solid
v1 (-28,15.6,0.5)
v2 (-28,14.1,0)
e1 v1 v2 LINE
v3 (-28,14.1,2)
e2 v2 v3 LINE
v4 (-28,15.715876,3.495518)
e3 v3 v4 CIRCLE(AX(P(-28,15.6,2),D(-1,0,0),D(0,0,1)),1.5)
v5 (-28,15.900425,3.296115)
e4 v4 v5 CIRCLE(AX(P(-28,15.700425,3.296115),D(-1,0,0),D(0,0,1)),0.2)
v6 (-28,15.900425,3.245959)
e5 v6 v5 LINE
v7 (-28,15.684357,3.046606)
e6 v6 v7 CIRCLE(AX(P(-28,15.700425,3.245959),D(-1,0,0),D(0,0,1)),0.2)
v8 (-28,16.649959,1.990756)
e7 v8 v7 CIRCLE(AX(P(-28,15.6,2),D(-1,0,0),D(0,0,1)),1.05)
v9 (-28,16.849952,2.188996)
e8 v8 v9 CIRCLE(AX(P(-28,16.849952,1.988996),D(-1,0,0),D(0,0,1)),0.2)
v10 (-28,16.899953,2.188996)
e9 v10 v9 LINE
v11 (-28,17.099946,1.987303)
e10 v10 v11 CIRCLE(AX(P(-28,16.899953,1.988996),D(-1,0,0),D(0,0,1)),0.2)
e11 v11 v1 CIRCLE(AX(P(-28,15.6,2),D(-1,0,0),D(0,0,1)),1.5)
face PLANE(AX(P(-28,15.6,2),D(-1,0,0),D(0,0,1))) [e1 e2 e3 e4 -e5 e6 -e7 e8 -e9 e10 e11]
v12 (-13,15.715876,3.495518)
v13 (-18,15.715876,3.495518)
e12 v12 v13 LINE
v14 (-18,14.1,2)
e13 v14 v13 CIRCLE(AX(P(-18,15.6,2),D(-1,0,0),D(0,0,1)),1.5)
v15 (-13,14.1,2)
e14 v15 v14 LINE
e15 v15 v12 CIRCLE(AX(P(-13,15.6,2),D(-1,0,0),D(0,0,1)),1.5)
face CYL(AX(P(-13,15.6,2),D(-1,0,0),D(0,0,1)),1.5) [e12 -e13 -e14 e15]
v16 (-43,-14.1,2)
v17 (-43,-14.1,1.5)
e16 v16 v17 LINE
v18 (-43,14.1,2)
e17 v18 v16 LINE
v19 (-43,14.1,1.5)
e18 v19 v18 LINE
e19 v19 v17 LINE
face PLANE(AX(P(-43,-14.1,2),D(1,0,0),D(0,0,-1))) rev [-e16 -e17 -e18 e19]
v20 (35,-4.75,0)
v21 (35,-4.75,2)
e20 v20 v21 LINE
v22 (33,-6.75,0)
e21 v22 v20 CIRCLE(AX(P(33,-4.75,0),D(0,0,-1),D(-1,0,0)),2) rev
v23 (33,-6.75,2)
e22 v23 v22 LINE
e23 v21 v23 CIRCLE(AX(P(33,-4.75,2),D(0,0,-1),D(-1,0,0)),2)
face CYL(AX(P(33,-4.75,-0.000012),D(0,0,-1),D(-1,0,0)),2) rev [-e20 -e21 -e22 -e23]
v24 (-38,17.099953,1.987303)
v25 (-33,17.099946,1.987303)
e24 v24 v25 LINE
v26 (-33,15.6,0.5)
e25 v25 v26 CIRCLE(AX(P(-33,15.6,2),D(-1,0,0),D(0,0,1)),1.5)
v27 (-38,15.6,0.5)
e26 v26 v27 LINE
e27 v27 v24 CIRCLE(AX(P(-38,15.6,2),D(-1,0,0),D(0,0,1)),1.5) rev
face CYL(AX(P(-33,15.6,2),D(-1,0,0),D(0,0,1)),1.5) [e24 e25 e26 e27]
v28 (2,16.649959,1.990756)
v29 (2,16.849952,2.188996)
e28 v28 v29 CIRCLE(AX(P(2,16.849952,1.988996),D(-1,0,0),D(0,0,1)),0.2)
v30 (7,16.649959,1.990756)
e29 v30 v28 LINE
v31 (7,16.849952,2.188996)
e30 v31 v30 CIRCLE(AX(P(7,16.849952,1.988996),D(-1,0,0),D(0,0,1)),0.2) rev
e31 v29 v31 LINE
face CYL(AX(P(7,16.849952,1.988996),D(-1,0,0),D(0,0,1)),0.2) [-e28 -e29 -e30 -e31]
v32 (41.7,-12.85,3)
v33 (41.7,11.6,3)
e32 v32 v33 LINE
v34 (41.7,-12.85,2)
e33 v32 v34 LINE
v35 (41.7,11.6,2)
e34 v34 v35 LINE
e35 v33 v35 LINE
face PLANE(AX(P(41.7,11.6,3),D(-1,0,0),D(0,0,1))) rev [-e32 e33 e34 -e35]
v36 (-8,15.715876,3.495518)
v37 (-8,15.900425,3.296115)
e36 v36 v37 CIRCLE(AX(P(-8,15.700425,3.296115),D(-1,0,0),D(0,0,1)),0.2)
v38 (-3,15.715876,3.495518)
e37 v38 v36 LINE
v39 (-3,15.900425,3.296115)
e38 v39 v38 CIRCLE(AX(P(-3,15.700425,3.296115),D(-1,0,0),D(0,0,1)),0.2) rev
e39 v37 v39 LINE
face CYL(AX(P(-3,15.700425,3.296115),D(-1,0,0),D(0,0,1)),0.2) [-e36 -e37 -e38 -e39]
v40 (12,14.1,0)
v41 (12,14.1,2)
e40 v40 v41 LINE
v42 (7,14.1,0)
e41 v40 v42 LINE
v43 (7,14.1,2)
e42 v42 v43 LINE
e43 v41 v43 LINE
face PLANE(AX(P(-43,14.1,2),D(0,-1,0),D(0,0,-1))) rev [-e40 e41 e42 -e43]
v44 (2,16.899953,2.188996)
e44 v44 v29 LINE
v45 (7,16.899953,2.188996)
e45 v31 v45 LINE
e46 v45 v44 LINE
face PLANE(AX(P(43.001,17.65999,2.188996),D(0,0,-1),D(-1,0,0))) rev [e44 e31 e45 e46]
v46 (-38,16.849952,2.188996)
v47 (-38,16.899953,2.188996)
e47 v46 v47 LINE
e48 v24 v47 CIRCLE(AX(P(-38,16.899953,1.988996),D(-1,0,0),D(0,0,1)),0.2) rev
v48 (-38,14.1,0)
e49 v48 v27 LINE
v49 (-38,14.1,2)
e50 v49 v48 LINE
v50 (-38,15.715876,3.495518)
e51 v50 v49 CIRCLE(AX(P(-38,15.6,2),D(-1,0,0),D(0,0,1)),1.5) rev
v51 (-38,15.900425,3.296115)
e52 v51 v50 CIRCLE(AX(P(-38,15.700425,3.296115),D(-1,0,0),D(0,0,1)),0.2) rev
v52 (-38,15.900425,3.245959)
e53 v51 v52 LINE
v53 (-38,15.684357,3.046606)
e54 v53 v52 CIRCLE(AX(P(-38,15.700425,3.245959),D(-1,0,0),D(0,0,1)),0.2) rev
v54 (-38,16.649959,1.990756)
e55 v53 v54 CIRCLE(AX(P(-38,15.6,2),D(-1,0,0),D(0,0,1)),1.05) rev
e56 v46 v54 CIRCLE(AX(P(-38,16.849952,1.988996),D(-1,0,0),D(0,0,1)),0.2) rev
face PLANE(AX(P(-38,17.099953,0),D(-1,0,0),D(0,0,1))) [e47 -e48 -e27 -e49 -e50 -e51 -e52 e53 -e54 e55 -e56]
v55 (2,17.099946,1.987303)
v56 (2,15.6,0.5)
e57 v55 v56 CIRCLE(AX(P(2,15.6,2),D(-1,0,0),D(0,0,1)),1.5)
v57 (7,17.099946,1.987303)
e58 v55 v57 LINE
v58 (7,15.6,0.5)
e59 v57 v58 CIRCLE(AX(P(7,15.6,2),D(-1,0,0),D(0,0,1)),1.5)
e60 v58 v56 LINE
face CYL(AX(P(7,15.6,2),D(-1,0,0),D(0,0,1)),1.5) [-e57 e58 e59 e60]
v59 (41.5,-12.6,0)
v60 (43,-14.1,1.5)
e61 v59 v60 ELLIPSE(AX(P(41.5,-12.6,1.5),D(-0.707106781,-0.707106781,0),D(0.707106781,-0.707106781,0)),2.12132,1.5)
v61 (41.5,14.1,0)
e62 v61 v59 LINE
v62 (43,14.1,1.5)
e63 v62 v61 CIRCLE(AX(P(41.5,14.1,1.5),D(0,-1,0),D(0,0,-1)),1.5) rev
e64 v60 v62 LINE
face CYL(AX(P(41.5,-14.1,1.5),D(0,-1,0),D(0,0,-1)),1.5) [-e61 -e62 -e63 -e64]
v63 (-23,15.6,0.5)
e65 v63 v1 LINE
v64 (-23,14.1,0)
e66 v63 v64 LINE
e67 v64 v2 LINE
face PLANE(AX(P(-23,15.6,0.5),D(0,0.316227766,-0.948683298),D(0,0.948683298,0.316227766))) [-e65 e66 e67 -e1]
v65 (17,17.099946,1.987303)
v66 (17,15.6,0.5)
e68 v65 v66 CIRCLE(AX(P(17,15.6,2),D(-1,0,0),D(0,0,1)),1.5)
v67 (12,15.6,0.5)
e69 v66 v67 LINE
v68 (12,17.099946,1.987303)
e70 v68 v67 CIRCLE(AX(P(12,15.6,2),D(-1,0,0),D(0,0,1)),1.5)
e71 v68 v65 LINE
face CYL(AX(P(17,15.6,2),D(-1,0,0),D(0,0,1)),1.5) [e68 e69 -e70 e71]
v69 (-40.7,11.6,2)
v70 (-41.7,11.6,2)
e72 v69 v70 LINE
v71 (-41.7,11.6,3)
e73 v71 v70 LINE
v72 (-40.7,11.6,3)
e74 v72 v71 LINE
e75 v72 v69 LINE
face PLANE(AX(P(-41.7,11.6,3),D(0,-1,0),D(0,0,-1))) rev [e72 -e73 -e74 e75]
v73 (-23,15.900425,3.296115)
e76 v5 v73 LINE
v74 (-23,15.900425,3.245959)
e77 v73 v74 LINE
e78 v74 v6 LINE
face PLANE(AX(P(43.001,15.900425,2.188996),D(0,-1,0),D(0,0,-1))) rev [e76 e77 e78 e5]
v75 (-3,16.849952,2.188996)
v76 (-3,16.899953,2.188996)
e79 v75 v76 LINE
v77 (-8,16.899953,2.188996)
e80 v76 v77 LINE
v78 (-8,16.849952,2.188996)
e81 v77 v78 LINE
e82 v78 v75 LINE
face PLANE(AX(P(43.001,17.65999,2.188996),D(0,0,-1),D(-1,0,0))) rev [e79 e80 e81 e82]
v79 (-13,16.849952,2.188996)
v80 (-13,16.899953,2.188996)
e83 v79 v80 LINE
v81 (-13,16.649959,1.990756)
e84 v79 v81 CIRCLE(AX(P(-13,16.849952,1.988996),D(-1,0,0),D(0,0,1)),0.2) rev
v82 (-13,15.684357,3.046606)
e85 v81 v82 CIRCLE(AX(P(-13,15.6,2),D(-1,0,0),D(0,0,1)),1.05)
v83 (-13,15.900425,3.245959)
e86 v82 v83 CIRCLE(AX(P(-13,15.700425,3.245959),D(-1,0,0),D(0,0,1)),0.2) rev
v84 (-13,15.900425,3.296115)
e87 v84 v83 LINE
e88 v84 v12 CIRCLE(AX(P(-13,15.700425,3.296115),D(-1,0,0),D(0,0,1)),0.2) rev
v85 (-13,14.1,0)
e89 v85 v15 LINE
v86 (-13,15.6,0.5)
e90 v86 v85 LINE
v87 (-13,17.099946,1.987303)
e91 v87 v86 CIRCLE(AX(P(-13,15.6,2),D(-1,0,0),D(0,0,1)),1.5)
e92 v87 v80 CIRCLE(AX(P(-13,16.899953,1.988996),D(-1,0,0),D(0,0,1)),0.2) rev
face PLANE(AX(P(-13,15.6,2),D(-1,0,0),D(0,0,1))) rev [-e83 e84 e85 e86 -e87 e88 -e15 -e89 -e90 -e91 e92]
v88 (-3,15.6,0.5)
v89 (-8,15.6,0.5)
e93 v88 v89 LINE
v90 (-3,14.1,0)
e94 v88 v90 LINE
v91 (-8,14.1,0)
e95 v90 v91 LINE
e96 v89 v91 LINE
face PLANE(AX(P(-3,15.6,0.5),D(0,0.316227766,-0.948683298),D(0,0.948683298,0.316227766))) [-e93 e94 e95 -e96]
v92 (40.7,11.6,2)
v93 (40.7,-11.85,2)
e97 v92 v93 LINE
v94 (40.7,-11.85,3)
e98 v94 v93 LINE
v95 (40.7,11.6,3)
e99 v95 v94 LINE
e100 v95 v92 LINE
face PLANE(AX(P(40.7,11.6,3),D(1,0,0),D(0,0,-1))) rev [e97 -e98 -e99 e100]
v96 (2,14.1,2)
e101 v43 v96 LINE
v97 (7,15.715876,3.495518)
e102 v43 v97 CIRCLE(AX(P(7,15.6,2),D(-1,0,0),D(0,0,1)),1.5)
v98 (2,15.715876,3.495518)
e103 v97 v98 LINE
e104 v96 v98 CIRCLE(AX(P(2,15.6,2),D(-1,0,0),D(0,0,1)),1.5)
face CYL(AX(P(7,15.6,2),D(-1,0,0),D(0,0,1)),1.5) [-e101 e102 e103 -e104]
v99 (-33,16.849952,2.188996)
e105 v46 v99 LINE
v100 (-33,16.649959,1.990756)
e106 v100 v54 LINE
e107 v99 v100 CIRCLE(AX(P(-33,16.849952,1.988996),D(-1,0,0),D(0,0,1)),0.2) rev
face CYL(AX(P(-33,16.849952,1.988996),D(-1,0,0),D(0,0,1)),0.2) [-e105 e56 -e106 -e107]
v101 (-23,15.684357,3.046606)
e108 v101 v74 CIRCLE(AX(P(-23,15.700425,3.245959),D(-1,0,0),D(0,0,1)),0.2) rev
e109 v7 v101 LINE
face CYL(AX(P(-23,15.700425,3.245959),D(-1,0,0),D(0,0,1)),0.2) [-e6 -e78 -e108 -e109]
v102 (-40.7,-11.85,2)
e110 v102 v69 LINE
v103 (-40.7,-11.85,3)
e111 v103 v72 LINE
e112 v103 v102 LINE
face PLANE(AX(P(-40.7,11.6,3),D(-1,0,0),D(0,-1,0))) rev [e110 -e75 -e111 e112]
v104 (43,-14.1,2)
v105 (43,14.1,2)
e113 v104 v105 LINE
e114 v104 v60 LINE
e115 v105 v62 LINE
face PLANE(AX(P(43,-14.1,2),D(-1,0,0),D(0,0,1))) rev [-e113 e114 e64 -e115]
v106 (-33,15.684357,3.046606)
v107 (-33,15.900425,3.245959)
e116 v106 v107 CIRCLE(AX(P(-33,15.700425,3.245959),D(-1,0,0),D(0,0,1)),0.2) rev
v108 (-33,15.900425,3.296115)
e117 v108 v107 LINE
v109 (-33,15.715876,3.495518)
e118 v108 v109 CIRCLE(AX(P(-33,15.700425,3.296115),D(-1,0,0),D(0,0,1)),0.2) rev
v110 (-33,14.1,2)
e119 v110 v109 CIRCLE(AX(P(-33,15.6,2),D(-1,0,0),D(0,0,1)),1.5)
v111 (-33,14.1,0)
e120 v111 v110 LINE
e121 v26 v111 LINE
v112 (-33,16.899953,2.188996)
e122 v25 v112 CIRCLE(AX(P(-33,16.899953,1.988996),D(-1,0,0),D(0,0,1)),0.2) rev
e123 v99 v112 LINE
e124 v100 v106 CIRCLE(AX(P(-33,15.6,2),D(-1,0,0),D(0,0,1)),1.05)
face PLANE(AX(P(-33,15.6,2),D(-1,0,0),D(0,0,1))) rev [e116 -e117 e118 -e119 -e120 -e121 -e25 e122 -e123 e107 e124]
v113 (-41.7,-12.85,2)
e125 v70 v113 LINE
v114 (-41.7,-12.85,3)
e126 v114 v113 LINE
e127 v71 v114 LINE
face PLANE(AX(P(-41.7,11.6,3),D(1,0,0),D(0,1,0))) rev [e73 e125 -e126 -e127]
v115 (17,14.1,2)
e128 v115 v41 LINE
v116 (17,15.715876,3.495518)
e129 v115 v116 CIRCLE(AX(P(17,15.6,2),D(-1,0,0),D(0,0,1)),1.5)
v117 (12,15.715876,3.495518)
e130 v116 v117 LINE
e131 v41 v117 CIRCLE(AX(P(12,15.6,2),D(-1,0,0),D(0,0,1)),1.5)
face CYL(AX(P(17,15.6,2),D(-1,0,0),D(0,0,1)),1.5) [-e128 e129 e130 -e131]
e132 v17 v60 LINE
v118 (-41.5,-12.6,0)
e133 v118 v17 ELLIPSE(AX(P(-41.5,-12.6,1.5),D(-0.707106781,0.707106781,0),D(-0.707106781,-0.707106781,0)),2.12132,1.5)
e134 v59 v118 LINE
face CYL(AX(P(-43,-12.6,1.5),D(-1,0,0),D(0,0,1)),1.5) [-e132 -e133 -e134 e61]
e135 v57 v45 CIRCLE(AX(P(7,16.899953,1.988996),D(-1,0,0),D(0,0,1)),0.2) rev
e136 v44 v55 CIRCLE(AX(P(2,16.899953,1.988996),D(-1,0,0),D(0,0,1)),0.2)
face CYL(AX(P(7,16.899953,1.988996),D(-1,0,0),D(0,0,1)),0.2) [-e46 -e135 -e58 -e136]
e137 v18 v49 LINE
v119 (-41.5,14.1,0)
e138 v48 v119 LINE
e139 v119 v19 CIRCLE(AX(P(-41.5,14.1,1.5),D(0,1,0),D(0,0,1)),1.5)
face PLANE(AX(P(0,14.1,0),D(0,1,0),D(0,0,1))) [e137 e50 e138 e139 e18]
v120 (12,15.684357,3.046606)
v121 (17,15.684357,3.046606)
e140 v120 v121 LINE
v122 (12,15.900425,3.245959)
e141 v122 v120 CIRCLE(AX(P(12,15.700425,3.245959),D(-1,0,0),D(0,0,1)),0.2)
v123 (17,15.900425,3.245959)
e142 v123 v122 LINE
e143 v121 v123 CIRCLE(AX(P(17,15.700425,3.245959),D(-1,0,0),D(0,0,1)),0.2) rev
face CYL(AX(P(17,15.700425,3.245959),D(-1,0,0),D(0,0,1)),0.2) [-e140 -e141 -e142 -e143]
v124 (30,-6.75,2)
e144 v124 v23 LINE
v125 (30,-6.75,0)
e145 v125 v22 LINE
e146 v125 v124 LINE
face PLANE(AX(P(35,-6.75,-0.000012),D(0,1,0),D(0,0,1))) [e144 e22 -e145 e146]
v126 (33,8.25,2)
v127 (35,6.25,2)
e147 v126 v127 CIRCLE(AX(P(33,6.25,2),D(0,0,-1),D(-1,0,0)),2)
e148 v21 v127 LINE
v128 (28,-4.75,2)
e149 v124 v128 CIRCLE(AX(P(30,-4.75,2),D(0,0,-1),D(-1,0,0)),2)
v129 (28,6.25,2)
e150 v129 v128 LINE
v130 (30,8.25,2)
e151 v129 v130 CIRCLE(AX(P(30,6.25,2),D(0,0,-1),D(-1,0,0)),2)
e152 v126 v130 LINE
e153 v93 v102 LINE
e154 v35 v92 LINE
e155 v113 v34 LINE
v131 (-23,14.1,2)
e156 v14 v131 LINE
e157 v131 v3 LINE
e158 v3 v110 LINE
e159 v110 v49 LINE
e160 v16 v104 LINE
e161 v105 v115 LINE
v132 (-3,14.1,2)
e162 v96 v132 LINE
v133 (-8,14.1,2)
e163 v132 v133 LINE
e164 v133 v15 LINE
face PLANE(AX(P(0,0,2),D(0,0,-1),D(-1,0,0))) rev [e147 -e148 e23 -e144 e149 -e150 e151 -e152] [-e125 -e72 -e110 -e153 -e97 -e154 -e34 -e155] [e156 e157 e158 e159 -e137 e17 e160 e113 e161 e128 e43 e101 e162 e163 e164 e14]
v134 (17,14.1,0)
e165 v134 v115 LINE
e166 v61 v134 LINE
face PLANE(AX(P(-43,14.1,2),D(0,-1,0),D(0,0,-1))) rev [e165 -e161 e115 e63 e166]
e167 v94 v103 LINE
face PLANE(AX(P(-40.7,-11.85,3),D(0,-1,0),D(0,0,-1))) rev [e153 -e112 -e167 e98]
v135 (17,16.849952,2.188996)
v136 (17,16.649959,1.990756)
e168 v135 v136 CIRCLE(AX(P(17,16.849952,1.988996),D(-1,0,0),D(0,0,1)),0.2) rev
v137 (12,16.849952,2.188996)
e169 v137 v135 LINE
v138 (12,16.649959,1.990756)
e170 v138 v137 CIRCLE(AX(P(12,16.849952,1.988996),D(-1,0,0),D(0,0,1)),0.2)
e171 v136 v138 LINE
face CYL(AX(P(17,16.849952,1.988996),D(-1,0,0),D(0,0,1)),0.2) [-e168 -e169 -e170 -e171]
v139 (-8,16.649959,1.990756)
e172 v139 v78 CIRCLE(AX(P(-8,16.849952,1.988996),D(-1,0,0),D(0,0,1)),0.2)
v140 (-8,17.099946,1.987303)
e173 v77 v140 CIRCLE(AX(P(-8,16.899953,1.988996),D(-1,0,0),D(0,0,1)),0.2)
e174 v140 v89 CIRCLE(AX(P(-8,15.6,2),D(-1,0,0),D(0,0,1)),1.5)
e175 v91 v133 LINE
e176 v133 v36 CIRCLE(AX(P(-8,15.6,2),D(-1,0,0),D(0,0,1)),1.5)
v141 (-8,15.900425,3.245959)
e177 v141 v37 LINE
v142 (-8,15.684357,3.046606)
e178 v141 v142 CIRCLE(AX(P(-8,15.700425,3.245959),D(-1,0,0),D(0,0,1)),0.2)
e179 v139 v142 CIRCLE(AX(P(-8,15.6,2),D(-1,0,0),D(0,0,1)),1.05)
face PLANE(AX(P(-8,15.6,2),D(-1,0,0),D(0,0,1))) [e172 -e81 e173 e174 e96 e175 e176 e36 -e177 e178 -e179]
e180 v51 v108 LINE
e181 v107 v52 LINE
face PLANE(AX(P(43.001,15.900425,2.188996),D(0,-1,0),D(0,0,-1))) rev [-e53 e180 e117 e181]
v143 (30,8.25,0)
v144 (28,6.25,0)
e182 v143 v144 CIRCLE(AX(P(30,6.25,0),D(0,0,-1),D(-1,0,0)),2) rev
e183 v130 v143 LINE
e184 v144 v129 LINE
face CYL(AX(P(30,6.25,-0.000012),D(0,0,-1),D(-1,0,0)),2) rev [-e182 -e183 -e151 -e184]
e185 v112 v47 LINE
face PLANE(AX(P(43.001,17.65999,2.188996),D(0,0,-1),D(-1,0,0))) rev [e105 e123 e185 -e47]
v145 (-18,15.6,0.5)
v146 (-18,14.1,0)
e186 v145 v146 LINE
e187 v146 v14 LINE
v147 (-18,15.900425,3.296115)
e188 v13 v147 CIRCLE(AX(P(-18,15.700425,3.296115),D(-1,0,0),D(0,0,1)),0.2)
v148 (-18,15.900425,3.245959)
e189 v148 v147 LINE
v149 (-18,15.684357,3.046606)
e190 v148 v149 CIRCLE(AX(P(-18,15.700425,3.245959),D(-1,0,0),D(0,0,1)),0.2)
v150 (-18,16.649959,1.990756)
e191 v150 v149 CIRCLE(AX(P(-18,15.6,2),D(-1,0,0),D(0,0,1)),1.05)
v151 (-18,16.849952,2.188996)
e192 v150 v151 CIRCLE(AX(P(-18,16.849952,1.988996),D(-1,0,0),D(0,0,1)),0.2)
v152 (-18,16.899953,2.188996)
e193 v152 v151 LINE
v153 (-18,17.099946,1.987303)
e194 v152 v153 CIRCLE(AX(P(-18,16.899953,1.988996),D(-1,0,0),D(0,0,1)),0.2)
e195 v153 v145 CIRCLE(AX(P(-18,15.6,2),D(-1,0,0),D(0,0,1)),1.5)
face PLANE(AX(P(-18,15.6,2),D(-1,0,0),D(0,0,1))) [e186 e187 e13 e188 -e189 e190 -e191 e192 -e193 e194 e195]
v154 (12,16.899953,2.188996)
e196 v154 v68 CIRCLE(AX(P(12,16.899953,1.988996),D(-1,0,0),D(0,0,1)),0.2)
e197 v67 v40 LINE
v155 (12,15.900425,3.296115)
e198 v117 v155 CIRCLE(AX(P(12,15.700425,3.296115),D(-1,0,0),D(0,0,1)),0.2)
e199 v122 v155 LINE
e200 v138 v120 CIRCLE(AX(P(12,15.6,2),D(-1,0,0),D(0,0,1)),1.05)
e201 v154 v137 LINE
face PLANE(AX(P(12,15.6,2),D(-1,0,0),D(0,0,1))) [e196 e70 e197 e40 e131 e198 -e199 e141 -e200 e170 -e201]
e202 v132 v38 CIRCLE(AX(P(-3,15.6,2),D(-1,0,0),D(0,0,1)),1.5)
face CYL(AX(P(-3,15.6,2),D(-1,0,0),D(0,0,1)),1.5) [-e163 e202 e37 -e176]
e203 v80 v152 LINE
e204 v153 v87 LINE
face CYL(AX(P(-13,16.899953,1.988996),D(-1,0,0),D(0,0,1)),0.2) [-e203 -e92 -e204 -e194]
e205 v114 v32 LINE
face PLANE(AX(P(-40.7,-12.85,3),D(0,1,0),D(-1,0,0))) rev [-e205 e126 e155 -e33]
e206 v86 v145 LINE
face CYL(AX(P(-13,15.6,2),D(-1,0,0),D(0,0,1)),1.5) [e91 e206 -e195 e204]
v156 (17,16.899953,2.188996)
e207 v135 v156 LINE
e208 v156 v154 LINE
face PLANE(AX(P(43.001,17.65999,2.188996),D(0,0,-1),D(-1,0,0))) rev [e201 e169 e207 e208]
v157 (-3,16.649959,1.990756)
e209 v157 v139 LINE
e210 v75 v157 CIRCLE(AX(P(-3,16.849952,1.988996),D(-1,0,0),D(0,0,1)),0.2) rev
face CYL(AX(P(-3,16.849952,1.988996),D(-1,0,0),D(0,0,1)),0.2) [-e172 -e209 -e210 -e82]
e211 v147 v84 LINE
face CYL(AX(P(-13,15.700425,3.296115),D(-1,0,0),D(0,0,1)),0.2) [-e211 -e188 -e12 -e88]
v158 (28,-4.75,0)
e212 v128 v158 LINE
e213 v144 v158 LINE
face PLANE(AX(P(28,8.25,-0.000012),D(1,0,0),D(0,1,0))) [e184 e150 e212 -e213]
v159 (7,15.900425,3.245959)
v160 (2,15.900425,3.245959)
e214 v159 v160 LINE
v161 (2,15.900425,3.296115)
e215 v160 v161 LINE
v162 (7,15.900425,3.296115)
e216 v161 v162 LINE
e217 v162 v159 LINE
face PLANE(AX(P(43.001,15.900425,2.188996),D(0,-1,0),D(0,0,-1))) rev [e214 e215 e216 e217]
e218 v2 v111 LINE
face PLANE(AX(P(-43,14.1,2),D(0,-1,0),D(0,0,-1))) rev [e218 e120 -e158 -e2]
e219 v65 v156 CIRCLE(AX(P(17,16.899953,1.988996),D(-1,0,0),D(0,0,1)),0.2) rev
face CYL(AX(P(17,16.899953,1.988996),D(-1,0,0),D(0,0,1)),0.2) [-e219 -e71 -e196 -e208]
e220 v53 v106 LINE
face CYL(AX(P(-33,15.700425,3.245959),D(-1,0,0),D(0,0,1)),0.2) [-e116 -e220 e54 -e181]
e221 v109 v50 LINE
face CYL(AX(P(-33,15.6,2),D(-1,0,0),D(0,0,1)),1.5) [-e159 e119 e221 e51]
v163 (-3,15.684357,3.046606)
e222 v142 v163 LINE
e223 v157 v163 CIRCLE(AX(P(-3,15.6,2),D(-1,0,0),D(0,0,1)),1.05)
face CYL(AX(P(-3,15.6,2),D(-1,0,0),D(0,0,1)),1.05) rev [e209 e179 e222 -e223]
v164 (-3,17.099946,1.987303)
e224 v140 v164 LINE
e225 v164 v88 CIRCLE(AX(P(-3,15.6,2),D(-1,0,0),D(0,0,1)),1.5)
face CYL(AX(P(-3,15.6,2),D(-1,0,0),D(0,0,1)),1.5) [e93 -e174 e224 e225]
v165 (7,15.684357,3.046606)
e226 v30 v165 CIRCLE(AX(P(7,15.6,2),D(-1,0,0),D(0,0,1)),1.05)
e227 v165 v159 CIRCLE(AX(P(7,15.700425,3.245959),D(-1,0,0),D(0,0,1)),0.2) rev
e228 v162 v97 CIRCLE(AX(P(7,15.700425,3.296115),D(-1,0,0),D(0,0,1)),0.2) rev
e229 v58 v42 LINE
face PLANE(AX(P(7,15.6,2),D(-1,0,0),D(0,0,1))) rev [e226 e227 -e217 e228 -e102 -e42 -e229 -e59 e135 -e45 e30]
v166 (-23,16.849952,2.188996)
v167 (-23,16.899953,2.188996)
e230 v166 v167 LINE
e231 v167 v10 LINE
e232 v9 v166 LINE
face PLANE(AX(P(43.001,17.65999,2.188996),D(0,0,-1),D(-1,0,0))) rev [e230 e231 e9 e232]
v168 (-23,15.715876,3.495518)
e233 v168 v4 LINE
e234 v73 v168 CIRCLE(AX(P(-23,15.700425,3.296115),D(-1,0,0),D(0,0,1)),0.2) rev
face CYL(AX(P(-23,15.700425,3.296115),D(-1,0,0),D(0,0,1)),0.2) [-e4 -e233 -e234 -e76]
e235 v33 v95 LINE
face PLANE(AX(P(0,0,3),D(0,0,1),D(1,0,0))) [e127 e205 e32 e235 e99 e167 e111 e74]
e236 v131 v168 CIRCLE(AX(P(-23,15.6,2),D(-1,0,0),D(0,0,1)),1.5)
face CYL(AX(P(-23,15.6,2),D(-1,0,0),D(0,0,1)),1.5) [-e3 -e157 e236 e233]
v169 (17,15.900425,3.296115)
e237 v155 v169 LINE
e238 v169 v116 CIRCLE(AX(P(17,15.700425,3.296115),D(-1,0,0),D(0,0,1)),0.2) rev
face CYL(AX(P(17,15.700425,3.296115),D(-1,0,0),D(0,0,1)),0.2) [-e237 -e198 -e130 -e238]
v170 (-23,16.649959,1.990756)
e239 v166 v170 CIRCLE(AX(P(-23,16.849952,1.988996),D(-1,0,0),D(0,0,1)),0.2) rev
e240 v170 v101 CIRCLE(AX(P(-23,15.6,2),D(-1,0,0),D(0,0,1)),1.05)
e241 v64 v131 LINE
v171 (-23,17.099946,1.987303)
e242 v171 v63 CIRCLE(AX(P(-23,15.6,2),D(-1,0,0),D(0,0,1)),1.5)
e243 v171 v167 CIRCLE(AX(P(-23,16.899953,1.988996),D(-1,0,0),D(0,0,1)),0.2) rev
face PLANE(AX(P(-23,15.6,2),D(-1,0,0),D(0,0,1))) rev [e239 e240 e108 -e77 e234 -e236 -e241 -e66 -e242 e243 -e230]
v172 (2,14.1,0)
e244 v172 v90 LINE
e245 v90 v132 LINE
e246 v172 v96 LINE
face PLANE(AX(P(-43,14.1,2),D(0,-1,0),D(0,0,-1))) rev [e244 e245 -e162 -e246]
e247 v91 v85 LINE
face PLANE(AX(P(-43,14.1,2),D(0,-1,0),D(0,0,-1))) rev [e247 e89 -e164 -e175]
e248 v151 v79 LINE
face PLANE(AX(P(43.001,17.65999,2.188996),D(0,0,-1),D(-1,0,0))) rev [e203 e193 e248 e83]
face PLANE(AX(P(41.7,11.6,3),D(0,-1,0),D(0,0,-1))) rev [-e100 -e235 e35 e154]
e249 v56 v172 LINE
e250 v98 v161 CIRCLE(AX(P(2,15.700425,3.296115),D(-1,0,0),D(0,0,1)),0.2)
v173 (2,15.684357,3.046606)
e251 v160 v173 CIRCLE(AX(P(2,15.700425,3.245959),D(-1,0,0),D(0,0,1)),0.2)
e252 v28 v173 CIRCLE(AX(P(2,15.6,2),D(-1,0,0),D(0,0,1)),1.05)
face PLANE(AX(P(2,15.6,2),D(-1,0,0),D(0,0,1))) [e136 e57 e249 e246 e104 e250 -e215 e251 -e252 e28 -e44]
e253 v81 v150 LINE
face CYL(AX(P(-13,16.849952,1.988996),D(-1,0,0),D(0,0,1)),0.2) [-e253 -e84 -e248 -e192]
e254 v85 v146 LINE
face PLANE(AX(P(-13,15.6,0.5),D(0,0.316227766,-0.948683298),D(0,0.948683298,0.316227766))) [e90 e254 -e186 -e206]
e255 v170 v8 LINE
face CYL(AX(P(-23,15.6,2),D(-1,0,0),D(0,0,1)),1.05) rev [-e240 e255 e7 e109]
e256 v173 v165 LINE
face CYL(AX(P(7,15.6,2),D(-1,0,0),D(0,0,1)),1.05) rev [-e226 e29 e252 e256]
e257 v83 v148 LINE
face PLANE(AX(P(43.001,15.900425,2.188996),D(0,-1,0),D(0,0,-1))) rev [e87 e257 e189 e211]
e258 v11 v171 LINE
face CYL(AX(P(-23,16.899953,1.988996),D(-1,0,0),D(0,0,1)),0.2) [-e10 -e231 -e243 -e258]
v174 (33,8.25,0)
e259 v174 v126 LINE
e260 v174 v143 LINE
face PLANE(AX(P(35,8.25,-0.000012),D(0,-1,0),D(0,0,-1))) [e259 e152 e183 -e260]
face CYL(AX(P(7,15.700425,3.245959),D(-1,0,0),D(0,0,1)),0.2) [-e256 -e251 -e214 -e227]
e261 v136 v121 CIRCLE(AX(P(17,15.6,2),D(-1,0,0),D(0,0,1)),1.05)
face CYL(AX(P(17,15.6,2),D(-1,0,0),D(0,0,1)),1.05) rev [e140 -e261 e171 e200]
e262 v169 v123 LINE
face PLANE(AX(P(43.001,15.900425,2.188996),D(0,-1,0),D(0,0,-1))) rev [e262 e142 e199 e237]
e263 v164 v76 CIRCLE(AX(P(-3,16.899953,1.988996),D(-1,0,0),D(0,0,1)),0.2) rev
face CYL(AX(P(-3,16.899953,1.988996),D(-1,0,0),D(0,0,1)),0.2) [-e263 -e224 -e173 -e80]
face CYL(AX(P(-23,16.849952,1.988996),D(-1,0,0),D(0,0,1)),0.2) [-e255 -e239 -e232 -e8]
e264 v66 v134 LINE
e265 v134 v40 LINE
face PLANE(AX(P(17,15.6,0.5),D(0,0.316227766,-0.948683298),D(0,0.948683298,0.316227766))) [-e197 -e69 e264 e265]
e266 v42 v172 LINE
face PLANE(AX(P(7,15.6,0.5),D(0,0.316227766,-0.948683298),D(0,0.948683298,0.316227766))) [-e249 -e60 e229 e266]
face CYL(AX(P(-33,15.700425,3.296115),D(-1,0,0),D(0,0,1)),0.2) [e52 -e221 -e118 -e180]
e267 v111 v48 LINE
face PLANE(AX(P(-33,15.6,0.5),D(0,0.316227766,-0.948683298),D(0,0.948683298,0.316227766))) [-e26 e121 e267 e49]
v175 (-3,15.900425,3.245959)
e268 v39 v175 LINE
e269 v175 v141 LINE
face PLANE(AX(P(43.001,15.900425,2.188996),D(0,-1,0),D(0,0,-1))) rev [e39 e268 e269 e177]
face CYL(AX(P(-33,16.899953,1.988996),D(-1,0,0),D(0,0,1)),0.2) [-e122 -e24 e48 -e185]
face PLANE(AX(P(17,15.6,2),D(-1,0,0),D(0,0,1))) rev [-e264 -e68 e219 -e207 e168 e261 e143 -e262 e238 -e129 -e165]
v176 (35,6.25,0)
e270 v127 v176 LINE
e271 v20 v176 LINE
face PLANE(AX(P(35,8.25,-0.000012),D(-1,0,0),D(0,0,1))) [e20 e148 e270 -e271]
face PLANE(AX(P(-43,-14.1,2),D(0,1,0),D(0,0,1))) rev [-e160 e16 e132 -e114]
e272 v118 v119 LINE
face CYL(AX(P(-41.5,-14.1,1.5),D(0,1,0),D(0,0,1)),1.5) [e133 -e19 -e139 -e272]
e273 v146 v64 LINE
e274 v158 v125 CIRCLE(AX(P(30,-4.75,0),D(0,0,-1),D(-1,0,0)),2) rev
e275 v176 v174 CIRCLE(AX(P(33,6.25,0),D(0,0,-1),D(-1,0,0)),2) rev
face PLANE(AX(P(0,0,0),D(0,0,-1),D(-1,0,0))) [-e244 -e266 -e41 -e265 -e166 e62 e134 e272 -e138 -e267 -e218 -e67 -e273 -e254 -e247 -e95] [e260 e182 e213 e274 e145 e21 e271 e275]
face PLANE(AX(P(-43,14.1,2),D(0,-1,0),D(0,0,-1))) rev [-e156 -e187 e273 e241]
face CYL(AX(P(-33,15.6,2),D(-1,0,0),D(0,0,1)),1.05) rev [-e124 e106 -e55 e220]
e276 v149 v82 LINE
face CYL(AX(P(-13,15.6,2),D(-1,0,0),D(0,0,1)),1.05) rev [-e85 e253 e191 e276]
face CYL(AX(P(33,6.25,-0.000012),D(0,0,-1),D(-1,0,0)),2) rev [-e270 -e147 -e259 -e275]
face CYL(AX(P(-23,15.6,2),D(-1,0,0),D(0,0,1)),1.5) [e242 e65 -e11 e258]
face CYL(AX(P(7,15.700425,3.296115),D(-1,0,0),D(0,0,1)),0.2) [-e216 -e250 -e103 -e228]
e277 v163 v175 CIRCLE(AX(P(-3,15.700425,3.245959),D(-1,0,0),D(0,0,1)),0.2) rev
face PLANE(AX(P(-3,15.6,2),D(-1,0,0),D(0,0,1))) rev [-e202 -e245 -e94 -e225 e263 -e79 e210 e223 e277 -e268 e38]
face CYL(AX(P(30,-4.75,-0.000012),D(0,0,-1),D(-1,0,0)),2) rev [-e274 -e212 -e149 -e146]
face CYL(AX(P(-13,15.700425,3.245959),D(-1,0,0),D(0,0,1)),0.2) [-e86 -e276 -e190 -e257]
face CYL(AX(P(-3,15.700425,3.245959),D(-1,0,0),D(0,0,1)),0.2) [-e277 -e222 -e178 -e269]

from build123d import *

# Parameters (mm, degrees)
SKETCH1_W               = 86
SKETCH1_H               = 28.2
BOSS_EXTRUDE1_DEPTH     = 2
SKETCH5_R               = 1.05
BOSS_EXTRUDE2_DEPTH     = 5
SKETCH8_W               = 1.75956426
SKETCH8_H               = 1.75956426
CUT_EXTRUDE3_DEPTH      = 5
FILLET4_R               = 0.2
LPATTERN1_COUNT         = 12
LPATTERN1_PITCH         = 5
LPATTERN1_2_COUNT       = 12
LPATTERN1_2_PITCH       = 5
FILLET4_OF_LPATTERN1_R  = 0.2
CUT_EXTRUDE1_START      = -43
CUT_EXTRUDE1_DEPTH      = 5
FILLET5_R               = 1.5
BOSS_EXTRUDE3_DEPTH     = 1
CUT_EXTRUDE6_DEPTH      = 47.407525329
CUT_EXTRUDE6_DEPTH_BACK = 47.407525329
SKETCH10_W              = 7
SKETCH10_H              = 15
FILLET6_R               = 2


# Read off the part's stored shape, not the designer's step: Cut-Extrude1
with BuildPart() as part:
    # Sketch1 → Boss-Extrude1 (new body)
    with BuildSketch(Plane.XY):
        Rectangle(SKETCH1_W, SKETCH1_H)
    extrude(amount=BOSS_EXTRUDE1_DEPTH)


with BuildPart() as body_2:
    # Sketch5 → Boss-Extrude2 (new body)
    with BuildSketch(Plane.ZY.offset(43)):
        with BuildLine():
            Line((0.5, 15.6), (0, 14.1))
            Line((0, 14.1), (2, 14.1))
            ThreePointArc((2, 14.1), (3.060660172, 16.660660172), (0.5, 15.6))
        make_face()
        with Locations((2, 15.6)):
            Circle(SKETCH5_R, mode=Mode.SUBTRACT)
    boss_extrude2 = extrude(amount=-BOSS_EXTRUDE2_DEPTH)

    # Sketch8 → Cut-Extrude3 (cut)
    with BuildSketch(Plane.ZY.offset(43)):
        with Locations((3.068777943, 16.78020761)):
            Rectangle(SKETCH8_W, SKETCH8_H)
    cut_extrude3 = extrude(amount=-CUT_EXTRUDE3_DEPTH, mode=Mode.SUBTRACT)

    # Fillet4
    fillet4_edges = [body_2.edges().sort_by_distance(p)[0] for p in [
        (-40.5, 16.632850707, 2.188995813),
        (-40.5, 15.90042548, 3.006103638),
        (-40.5, 17.088045894, 2.188995813),
        (-40.5, 15.90042548, 3.469606931),
    ]]
    fillet(fillet4_edges, radius=FILLET4_R)


with BuildPart() as part_1:
    add(part.part)

    add(body_2.part)  # LPattern1 merges body 2
    # LPattern1: Boss-Extrude2 ×12, 5 skipped
    with Locations(*[(i * LPATTERN1_PITCH, 0, 0) for i in range(1, LPATTERN1_COUNT) if i not in (2, 4, 6, 8, 10)]):
        add(boss_extrude2)

    # LPattern1 2: Cut-Extrude3 ×12, 5 skipped
    with Locations(*[(i * LPATTERN1_2_PITCH, 0, 0) for i in range(1, LPATTERN1_2_COUNT) if i not in (2, 4, 6, 8, 10)]):
        add(cut_extrude3, mode=Mode.SUBTRACT)

    # Fillet4 of LPattern1
    fillet4_of_lpattern1_edges = [part_1.edges().sort_by_distance(p)[0] for p in [
        (-35.5, 16.632850707, 2.188995813),
        (-35.5, 15.90042548, 3.006103638),
        (-35.5, 17.088045894, 2.188995813),
        (-35.5, 15.90042548, 3.469606931),
        (-25.5, 16.632850707, 2.188995813),
        (-25.5, 15.90042548, 3.006103638),
        (-25.5, 17.088045894, 2.188995813),
        (-25.5, 15.90042548, 3.469606931),
        (-15.5, 16.632850707, 2.188995813),
        (-15.5, 15.90042548, 3.006103638),
        (-15.5, 17.088045894, 2.188995813),
        (-15.5, 15.90042548, 3.469606931),
        (-5.5, 16.632850707, 2.188995813),
        (-5.5, 15.90042548, 3.006103638),
        (-5.5, 17.088045894, 2.188995813),
        (-5.5, 15.90042548, 3.469606931),
        (4.5, 16.632850707, 2.188995813),
        (4.5, 15.90042548, 3.006103638),
        (4.5, 17.088045894, 2.188995813),
        (4.5, 15.90042548, 3.469606931),
        (14.5, 16.632850707, 2.188995813),
        (14.5, 15.90042548, 3.006103638),
        (14.5, 17.088045894, 2.188995813),
        (14.5, 15.90042548, 3.469606931),
    ]]
    fillet(fillet4_of_lpattern1_edges, radius=FILLET4_OF_LPATTERN1_R)

    # Cut-Extrude1 outline → Cut-Extrude1 (cut)
    with BuildSketch(Plane.YZ.offset(CUT_EXTRUDE1_START)):
        with BuildLine():
            Line((14.1, 2), (14.1, 0))
            Line((14.1, 0), (15.6, 0.5))
            ThreePointArc((15.6, 0.5), (16.656161515, 0.934860171), (17.09994626, 1.987302861))
            ThreePointArc((17.09994626, 1.987302861), (17.041972069, 2.129817348), (16.899953425, 2.188995813))
            Line((16.899953425, 2.188995813), (16.849951562, 2.188995813))
            ThreePointArc((16.849951562, 2.188995813), (16.709154073, 2.131038296), (16.649959312, 1.990756483))
            ThreePointArc((16.649959312, 1.990756483), (14.825162546, 1.291390855), (15.684357403, 3.046605861))
            ThreePointArc((15.684357403, 3.046605861), (15.836046984, 3.098966816), (15.90042548, 3.245959359))
            Line((15.90042548, 3.245959359), (15.90042548, 3.296115243))
            ThreePointArc((15.90042548, 3.296115243), (15.847207656, 3.431964397), (15.715875553, 3.495517588))
            ThreePointArc((15.715875553, 3.495517588), (14.581131346, 3.100866325), (14.1, 2))
        make_face()
    extrude(amount=CUT_EXTRUDE1_DEPTH, mode=Mode.SUBTRACT)

    # Fillet5
    fillet5_edges = [part_1.edges().sort_by_distance(p)[0] for p in [
        (0, -14.1, 0),
        (-43, 0, 0),
        (43, 0, 0),
    ]]
    fillet(fillet5_edges, radius=FILLET5_R)

    # Sketch9 → Boss-Extrude3 (add)
    with BuildSketch(Plane.XY.offset(2)):
        Polygon((-41.7, 11.6), (-40.7, 11.6), (-40.7, -11.85), (40.7, -11.85), (40.7, 11.6), (41.7, 11.6), (41.7, -11.85), (41.7, -12.85), (-40.7, -12.85), (-41.7, -12.85), align=None)
    extrude(amount=BOSS_EXTRUDE3_DEPTH)

    # Sketch10 → Cut-Extrude6 (cut, two sides: drawn at the far end of the back side and taken through both)
    with BuildSketch(Plane(origin=(0, 0, 0), x_dir=(-1, 0, 0), z_dir=(0, 0, -1)).offset(-CUT_EXTRUDE6_DEPTH_BACK)):
        with Locations((-31.5, 0.75)):
            Rectangle(SKETCH10_W, SKETCH10_H)
    extrude(amount=CUT_EXTRUDE6_DEPTH + CUT_EXTRUDE6_DEPTH_BACK, mode=Mode.SUBTRACT)

    # Fillet6
    fillet6_edges = [part_1.edges().sort_by_distance(p)[0] for p in [
        (28, -6.75, 1),
        (28, 8.25, 1),
        (35, 8.25, 1),
        (35, -6.75, 1),
    ]]
    fillet(fillet6_edges, radius=FILLET6_R)


solid = part_1.part
